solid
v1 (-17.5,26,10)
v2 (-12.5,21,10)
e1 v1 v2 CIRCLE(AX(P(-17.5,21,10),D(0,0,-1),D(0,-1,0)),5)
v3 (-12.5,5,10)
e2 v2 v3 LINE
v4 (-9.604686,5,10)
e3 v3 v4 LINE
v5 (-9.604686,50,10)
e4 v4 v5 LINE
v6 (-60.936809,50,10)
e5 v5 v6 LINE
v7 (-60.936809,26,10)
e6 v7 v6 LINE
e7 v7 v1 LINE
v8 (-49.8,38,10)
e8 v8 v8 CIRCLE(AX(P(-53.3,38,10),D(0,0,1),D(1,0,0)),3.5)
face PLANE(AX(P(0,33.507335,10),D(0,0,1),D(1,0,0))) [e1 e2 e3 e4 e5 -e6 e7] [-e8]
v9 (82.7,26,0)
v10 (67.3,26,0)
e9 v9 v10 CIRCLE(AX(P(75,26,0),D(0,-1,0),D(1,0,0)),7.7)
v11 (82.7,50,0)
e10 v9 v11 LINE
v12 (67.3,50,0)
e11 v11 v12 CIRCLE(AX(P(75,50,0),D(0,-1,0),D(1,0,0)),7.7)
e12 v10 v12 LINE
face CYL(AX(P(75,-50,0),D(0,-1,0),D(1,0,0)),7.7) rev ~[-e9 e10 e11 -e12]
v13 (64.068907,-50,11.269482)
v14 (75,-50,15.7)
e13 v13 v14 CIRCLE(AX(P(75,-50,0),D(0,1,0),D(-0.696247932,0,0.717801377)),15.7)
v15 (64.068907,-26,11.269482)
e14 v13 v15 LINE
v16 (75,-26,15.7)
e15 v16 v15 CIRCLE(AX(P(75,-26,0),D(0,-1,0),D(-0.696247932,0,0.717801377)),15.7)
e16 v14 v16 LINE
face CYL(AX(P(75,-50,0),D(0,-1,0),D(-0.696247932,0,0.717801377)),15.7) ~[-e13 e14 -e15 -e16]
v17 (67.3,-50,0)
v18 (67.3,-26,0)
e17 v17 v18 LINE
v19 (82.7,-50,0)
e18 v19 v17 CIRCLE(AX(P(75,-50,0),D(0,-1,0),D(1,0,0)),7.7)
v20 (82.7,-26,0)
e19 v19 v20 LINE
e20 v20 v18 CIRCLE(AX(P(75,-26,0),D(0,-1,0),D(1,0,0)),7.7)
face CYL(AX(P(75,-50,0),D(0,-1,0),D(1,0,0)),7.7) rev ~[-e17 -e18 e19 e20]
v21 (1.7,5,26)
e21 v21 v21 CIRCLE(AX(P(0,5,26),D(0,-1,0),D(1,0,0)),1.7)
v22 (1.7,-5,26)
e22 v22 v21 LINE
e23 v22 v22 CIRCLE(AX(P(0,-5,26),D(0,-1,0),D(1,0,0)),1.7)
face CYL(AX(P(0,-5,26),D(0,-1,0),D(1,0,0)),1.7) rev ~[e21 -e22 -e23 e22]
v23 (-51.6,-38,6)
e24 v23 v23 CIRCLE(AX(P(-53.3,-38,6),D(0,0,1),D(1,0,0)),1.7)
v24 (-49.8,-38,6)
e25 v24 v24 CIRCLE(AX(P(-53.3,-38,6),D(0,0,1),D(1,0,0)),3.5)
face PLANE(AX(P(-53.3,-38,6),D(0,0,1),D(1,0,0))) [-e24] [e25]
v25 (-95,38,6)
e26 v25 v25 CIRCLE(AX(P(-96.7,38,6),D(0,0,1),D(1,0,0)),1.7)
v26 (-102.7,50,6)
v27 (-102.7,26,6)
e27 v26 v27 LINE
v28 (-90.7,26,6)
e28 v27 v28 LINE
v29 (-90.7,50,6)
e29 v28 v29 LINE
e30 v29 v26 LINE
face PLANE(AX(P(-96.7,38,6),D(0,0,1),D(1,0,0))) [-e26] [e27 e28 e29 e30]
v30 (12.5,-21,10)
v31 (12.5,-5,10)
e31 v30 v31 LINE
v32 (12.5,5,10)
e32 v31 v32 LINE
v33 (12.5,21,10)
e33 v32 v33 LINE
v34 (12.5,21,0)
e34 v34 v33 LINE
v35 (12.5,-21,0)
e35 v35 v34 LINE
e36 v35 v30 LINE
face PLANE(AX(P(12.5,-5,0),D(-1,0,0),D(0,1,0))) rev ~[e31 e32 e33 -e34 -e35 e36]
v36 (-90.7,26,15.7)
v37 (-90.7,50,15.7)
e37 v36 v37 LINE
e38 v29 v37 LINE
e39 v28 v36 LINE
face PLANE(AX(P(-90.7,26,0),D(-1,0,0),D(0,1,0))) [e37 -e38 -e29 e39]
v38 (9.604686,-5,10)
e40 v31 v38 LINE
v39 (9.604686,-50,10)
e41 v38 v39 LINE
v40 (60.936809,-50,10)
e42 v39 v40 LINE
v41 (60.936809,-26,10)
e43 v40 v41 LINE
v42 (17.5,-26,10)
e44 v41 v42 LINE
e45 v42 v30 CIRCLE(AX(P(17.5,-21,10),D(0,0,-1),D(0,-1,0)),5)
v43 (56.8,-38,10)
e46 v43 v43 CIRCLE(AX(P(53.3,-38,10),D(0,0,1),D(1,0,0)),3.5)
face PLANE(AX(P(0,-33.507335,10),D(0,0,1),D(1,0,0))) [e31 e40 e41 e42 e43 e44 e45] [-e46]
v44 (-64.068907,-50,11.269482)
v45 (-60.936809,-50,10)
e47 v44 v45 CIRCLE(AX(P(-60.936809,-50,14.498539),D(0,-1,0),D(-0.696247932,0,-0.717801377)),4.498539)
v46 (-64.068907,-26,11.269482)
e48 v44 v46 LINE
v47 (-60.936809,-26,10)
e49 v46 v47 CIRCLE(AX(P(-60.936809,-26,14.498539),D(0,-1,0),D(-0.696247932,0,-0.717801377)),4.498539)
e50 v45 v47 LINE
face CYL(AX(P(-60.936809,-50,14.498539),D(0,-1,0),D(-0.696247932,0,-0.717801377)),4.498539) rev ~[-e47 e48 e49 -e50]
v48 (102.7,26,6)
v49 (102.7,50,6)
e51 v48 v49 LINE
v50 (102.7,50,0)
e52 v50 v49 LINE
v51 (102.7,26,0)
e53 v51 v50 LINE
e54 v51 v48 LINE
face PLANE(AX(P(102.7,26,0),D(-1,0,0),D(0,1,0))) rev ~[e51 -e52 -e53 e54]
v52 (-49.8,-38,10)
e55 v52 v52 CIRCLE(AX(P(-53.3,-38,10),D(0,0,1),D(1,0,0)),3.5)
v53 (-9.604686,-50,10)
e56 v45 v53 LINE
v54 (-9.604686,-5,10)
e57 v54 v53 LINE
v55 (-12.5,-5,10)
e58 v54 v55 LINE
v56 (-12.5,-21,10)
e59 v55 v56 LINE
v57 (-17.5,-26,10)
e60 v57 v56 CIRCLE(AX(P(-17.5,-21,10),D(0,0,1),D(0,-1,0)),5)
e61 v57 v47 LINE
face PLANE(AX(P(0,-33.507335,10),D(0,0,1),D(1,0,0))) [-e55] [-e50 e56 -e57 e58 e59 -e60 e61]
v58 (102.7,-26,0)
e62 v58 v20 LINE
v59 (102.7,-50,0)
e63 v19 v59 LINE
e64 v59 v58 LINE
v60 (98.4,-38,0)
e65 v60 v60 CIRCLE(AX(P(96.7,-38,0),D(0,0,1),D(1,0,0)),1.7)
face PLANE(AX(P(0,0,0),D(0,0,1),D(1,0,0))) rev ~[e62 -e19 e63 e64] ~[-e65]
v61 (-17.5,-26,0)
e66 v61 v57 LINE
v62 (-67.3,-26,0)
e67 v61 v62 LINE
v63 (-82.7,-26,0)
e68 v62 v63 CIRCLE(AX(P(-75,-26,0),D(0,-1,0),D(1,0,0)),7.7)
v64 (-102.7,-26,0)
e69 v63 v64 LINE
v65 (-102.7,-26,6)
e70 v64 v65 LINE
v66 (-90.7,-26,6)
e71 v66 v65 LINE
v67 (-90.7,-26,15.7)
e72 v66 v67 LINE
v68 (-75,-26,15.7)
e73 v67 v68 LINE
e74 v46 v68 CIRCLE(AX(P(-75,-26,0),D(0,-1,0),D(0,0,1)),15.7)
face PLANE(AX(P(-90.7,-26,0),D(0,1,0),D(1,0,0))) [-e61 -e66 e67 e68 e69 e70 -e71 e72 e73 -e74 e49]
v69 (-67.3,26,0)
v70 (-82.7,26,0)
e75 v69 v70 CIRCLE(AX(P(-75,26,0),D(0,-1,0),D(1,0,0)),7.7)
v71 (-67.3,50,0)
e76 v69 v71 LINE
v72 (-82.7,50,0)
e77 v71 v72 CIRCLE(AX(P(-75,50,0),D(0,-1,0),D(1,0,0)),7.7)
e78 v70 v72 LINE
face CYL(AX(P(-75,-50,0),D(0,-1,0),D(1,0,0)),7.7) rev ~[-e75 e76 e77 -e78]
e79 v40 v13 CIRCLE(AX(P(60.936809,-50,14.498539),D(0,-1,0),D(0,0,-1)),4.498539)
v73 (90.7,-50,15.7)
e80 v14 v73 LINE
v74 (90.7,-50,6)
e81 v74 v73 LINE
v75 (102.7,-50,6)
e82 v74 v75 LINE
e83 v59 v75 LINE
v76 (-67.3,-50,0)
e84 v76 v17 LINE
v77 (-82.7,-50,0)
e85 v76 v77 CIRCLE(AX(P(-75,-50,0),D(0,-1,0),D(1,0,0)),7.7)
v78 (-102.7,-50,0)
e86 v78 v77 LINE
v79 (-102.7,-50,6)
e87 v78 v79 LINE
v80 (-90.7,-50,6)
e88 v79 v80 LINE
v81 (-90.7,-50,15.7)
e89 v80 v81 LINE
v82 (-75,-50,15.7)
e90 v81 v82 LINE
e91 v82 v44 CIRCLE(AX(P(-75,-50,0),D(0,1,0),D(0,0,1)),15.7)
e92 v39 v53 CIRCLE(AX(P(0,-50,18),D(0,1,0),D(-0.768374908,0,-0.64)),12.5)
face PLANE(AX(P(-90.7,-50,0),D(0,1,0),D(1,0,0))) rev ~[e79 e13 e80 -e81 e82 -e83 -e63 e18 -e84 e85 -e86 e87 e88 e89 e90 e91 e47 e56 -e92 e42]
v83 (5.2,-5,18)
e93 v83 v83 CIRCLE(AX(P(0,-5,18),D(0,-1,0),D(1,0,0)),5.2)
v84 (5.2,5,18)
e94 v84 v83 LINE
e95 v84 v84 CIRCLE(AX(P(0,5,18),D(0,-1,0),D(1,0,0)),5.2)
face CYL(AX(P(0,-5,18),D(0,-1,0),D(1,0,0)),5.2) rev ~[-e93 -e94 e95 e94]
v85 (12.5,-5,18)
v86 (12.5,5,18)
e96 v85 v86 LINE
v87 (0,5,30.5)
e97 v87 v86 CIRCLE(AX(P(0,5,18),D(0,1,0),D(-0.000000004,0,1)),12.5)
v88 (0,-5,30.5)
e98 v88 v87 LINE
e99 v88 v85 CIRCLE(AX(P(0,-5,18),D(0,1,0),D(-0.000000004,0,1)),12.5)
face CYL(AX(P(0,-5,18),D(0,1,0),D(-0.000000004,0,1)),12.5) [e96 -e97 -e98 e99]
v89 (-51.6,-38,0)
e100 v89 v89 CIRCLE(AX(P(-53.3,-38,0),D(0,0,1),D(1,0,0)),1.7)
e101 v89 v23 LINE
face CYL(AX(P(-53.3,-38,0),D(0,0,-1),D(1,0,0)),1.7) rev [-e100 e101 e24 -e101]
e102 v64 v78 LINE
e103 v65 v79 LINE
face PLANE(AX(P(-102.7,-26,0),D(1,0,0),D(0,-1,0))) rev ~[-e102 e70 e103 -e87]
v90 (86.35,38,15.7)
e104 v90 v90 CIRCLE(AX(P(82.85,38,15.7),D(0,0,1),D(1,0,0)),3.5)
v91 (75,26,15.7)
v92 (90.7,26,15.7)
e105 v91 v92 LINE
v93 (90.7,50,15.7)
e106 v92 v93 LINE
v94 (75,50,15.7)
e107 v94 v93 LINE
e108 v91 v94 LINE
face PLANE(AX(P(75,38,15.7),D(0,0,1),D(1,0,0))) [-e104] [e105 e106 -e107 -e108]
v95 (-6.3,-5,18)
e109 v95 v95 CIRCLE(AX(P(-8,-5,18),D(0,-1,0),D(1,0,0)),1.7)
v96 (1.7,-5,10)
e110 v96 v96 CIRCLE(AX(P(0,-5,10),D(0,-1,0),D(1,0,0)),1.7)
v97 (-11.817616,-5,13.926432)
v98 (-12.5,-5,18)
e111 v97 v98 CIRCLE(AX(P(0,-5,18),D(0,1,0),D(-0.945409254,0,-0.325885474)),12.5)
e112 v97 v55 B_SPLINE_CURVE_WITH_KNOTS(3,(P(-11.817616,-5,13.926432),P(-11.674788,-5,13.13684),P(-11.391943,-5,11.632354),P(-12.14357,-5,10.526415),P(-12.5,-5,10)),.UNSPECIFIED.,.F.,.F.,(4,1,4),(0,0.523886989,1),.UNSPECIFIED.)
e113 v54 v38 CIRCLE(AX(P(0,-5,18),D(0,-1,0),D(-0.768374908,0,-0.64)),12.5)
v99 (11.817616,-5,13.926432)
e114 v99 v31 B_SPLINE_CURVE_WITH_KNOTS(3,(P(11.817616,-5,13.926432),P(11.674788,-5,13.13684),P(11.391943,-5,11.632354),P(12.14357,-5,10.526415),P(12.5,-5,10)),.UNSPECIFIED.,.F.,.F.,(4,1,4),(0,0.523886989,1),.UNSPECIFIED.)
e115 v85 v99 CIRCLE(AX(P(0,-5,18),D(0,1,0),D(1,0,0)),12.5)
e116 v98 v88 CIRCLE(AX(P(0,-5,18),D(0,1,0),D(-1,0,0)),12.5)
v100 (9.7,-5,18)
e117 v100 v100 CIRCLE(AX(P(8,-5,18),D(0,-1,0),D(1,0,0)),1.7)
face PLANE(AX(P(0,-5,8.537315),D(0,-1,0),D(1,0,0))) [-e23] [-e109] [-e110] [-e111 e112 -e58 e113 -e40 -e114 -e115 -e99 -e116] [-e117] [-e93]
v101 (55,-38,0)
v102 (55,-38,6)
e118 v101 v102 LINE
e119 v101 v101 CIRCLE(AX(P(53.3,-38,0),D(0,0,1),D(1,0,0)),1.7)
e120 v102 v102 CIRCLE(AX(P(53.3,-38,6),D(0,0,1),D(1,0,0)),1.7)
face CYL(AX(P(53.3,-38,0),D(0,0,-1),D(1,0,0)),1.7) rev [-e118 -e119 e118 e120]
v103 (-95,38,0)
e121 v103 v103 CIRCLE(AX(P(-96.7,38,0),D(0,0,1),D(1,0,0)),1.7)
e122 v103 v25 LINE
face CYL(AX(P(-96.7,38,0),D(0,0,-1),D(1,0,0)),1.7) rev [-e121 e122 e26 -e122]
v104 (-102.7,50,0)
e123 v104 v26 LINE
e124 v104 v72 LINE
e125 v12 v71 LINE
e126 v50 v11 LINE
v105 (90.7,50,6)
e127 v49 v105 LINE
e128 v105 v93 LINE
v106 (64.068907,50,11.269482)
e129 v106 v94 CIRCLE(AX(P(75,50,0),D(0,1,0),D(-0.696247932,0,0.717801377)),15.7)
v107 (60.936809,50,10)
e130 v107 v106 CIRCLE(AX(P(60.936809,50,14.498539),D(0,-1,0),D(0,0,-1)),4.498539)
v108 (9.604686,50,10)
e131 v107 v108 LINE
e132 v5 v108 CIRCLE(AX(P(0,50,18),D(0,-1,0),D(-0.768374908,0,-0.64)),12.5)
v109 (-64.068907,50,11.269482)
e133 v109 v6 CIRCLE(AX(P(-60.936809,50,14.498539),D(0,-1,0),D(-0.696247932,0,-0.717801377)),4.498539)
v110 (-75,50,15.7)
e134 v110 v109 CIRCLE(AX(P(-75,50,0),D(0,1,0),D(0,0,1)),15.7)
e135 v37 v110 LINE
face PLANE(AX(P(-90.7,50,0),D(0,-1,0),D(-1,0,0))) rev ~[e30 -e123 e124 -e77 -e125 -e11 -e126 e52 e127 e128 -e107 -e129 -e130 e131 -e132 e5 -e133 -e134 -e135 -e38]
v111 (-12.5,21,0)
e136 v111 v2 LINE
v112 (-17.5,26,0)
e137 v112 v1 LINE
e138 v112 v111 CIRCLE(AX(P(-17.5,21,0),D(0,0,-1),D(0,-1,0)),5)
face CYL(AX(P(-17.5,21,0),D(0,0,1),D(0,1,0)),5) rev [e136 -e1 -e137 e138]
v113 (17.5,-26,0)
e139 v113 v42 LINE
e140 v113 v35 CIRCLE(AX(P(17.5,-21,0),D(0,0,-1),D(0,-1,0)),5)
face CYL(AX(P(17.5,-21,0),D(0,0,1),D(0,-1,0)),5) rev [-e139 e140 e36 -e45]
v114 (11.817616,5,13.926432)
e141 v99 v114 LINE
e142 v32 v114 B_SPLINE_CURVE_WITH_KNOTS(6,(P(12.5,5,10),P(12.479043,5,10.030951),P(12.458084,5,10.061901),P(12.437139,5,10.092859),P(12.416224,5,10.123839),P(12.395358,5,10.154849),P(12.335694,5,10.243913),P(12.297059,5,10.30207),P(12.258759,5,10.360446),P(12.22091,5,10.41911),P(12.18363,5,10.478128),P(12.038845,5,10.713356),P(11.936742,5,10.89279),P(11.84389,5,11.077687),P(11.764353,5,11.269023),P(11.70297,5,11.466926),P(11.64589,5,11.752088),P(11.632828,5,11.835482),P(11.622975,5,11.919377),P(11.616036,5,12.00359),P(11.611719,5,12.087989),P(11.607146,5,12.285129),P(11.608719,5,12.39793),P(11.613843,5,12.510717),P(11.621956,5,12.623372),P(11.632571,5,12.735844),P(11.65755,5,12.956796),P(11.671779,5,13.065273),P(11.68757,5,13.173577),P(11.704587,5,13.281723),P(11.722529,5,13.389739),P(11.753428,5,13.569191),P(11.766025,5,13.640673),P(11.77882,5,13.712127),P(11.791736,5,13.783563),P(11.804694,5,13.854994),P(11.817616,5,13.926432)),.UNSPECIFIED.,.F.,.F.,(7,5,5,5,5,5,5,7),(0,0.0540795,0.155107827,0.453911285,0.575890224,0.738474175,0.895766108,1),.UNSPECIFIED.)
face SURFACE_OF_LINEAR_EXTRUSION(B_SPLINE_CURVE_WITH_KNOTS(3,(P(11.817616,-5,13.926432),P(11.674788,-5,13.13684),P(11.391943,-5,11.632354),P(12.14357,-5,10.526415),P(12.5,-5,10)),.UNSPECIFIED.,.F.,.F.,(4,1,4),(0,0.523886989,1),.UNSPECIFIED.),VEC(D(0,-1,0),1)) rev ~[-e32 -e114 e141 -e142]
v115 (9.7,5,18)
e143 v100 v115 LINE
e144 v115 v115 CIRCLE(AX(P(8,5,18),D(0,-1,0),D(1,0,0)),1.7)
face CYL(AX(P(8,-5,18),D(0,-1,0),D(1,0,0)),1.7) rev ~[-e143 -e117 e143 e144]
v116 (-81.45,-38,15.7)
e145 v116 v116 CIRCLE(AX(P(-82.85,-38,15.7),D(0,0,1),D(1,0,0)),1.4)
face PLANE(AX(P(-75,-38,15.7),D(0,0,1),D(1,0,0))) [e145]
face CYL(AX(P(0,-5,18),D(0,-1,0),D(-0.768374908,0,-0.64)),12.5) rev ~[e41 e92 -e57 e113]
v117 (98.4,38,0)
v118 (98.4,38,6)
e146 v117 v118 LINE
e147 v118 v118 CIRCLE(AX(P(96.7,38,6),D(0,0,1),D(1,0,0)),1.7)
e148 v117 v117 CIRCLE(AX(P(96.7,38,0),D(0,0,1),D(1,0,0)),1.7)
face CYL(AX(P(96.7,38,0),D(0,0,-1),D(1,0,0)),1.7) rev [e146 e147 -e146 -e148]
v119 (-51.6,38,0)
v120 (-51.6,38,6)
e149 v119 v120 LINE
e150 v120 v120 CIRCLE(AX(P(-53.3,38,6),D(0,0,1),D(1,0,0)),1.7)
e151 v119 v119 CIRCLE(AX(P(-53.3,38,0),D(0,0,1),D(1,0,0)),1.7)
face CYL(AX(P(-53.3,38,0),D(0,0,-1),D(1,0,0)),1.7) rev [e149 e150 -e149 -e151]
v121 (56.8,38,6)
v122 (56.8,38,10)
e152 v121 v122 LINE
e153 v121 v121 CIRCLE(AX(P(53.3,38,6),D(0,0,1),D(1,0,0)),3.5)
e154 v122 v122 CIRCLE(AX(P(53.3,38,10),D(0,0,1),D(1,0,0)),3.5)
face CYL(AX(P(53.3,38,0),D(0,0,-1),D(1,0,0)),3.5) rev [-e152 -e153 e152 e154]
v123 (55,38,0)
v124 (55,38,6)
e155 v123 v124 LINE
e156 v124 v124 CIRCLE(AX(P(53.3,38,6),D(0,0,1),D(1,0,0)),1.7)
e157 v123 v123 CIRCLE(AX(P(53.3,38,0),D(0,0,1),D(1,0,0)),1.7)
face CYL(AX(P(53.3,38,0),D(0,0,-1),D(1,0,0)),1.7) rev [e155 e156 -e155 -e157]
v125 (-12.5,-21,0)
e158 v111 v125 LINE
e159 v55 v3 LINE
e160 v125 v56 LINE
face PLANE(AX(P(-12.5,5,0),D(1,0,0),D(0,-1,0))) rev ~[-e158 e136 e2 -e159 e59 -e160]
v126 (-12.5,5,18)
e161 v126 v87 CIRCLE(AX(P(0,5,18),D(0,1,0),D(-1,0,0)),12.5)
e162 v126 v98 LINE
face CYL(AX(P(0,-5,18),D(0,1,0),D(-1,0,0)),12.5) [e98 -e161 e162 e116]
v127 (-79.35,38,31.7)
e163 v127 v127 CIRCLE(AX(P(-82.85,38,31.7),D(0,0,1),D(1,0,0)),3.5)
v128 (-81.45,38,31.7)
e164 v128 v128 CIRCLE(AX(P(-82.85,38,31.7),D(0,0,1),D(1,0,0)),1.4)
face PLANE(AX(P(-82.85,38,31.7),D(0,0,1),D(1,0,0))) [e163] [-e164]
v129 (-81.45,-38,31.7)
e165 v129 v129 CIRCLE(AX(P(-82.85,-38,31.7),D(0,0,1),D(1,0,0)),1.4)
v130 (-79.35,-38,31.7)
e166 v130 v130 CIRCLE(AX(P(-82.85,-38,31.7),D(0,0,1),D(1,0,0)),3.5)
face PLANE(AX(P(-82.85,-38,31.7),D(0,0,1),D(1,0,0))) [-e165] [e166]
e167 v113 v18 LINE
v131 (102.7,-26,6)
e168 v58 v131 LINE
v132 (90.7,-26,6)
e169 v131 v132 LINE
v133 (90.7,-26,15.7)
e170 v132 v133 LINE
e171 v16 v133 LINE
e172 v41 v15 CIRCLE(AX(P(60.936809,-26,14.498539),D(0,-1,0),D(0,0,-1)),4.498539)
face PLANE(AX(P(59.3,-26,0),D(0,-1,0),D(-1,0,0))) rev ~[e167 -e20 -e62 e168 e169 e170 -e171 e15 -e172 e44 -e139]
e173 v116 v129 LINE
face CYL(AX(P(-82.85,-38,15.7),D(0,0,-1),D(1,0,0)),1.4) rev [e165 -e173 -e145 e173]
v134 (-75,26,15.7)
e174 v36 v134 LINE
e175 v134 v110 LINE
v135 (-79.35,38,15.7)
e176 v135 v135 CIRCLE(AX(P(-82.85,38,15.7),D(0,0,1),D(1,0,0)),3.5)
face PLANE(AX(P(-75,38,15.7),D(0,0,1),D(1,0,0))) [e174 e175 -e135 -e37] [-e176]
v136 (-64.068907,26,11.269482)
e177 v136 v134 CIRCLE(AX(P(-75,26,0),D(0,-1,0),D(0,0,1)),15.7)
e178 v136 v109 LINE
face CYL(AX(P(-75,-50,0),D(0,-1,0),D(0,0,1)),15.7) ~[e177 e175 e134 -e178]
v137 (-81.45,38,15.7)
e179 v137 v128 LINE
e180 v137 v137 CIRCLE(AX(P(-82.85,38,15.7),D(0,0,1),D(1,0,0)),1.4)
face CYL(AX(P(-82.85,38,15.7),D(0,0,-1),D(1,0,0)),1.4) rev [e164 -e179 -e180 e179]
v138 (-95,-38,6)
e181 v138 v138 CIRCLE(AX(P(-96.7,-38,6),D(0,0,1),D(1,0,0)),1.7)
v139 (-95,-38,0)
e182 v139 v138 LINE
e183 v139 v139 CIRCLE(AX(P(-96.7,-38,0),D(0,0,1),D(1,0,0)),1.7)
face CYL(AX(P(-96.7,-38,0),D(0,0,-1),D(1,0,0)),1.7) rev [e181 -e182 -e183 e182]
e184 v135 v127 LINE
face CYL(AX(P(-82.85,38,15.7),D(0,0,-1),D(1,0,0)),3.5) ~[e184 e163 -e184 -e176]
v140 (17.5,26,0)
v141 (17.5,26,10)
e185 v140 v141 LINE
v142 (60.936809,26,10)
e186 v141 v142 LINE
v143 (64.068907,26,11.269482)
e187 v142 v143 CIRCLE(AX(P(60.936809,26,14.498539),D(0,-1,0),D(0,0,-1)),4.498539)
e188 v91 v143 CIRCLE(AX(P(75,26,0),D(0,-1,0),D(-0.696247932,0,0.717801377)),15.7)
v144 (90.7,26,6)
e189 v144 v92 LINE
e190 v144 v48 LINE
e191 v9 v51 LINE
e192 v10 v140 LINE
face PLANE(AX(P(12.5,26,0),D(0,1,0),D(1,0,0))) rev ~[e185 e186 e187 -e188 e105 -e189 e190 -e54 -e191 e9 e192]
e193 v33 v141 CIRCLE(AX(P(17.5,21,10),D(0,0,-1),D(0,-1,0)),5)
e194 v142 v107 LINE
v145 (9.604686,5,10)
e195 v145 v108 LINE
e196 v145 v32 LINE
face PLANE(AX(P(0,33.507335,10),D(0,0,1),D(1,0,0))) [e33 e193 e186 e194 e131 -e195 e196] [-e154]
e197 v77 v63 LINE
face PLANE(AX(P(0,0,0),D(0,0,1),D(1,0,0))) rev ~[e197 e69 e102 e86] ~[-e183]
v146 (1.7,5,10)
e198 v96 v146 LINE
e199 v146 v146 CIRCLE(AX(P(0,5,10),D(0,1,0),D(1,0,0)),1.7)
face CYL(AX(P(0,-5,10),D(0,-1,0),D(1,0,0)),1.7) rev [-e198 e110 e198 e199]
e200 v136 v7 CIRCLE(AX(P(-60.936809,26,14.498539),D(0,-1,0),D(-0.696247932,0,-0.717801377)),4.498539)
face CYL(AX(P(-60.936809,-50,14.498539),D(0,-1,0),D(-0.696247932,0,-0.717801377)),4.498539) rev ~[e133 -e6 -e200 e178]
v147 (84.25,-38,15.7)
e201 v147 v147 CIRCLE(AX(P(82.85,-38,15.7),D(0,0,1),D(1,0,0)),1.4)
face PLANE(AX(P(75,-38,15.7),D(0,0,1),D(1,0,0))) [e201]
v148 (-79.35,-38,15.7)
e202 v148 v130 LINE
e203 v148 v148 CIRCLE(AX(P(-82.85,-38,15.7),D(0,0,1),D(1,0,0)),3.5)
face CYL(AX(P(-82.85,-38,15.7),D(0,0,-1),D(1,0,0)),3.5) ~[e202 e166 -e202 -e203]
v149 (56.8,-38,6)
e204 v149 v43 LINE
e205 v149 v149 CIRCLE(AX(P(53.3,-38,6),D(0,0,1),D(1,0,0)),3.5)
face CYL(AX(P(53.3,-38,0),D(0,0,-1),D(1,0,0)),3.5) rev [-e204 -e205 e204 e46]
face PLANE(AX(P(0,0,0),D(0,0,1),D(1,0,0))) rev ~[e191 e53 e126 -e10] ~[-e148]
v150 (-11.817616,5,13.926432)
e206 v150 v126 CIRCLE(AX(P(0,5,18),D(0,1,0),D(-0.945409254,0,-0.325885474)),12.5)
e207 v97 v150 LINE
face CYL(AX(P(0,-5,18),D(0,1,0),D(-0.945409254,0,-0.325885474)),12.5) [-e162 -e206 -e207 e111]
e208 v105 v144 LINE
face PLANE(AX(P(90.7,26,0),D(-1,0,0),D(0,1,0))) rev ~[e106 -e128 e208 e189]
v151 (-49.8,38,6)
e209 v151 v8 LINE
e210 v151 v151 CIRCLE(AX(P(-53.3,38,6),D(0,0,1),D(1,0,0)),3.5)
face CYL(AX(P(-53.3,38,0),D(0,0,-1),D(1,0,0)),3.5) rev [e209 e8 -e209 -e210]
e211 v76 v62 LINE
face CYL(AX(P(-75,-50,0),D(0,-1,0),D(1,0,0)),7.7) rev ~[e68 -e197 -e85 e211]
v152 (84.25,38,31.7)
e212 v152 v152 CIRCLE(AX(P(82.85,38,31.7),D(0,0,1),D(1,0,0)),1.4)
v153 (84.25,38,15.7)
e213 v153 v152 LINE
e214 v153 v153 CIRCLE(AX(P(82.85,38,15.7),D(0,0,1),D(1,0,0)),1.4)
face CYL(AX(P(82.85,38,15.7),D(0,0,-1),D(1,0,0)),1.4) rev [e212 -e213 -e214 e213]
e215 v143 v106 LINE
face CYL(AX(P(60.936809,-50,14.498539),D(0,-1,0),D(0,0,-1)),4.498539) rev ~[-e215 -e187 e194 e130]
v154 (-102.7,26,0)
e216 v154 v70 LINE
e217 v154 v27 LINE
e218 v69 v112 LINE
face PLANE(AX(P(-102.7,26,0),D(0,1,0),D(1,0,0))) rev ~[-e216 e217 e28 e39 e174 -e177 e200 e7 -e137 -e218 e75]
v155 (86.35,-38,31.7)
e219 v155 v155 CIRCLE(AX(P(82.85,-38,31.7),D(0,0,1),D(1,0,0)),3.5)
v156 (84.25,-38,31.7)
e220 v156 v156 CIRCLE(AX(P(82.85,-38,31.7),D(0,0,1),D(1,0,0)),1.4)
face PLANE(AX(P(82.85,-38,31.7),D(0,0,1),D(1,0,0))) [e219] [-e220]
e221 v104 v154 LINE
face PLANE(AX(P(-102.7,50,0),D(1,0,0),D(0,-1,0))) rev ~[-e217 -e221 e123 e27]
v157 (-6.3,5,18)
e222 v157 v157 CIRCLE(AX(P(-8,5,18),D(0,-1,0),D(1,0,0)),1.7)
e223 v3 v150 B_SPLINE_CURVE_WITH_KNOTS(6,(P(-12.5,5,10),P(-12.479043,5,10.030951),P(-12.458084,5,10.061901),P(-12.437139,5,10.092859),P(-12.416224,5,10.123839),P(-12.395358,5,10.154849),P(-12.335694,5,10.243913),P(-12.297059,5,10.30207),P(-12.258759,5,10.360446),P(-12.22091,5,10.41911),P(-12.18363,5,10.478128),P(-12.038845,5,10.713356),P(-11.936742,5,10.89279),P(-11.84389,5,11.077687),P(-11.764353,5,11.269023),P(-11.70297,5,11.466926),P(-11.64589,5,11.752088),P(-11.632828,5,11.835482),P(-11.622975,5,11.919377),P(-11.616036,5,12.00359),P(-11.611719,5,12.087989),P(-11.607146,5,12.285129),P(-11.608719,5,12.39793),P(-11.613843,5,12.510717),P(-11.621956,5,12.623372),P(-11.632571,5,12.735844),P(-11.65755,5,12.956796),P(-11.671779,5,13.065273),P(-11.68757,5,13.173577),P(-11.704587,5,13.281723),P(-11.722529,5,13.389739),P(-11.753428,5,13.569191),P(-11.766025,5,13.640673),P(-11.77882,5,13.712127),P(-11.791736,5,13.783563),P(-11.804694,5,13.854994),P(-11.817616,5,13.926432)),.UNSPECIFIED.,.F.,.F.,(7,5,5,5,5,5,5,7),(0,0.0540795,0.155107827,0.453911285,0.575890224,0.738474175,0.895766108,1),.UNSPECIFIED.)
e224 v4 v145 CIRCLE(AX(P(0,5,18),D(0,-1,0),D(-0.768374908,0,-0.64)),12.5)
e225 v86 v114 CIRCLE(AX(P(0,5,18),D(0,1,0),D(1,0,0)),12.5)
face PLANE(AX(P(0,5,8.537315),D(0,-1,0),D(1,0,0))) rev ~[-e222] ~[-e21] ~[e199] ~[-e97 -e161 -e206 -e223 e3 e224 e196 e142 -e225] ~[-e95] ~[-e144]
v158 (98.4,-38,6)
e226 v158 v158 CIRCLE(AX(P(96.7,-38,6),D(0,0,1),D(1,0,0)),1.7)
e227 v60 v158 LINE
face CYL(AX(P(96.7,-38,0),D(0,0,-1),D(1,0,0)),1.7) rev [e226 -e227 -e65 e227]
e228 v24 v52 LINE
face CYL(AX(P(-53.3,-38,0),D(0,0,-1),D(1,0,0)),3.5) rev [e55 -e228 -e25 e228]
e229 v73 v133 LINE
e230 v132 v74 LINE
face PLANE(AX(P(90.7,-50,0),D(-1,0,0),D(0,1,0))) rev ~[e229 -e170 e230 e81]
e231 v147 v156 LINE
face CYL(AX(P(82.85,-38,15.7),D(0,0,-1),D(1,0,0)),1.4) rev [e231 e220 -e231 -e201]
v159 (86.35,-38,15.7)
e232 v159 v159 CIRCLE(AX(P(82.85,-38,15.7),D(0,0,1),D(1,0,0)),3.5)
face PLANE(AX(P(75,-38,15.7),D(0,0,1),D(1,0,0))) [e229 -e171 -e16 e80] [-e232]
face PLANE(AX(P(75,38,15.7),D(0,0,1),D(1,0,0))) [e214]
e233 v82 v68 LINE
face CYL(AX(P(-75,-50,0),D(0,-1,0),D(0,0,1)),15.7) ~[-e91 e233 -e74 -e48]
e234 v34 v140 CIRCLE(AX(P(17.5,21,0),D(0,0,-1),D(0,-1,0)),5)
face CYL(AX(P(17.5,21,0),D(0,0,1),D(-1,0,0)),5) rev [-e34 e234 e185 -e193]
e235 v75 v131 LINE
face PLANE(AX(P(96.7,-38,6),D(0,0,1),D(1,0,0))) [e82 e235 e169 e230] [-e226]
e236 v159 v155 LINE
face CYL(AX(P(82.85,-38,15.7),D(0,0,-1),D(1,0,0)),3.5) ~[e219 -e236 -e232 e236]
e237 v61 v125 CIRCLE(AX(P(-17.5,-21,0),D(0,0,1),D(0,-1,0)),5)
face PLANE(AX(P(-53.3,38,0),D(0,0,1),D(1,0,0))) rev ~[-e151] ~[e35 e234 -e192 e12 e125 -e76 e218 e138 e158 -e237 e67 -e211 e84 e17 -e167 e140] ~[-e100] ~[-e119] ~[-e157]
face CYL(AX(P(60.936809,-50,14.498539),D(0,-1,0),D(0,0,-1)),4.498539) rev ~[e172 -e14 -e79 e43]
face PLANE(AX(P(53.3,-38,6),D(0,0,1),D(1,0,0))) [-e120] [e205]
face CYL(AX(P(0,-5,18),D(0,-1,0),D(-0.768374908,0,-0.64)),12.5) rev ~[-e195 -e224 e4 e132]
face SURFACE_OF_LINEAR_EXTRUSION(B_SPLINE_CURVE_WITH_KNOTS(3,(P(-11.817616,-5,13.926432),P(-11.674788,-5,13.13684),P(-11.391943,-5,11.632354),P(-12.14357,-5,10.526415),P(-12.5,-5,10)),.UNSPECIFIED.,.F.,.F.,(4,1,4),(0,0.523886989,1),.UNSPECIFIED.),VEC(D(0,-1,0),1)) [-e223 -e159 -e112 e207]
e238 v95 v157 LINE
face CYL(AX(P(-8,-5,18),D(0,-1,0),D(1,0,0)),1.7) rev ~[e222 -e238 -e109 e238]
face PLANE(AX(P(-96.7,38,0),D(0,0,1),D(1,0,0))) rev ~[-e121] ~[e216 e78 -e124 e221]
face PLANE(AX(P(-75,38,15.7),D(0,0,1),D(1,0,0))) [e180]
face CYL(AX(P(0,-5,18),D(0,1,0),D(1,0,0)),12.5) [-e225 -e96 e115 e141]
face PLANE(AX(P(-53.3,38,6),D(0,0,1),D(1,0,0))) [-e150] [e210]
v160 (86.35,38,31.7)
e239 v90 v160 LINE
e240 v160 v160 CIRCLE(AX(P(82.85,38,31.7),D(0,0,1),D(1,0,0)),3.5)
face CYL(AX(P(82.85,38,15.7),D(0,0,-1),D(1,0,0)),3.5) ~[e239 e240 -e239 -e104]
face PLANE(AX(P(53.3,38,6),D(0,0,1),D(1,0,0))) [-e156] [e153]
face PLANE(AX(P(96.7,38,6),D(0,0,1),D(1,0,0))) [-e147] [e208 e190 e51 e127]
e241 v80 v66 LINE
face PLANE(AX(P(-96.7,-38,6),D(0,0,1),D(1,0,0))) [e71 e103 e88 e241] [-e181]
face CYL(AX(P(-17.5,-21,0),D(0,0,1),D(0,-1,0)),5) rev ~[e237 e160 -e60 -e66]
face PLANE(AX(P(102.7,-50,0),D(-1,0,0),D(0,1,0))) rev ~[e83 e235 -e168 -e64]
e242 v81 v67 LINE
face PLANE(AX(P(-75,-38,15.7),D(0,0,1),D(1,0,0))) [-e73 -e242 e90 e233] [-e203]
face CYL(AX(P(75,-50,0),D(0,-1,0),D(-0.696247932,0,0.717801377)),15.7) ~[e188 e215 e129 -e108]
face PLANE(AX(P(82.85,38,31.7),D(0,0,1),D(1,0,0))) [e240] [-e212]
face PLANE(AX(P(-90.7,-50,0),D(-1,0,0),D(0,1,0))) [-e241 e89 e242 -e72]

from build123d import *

# Parameters (mm, degrees)
F0_R      = 3.5
F1_DEPTH  = 10
F0_W      = 31.4
F0_H      = 24
F2_DEPTH  = 15.7
F3_DEPTH  = 30.5
F6_DEPTH  = 100
F7_R      = 1.7
F7_R_2    = 5.2
F8_DEPTH  = 60
F9_DEPTH  = 100
F10_DEPTH = 100
F11_DEPTH = 10
F12_R     = 5
F0_R_2    = 1.7
F13_DEPTH = 6
F14_DEPTH = 6
F15_R     = 3.5
F15_R_2   = 1.4
F16_DEPTH = 16


# Not quite as in the source:
# - a feature names something its author has since deleted; it is built from what else it names


with BuildPart() as f1:
    # F0 (on Top) → F1 (new body)
    with BuildSketch(Plane.XY):
        Polygon((59.3, 50), (0, 50), (-59.3, 50), (-59.3, 26), (-12.5, 26), (-12.5, 5), (12.5, 5), (12.5, 26), (59.3, 26), align=None)
        with Locations((-53.3, 38)):
            Circle(F0_R, mode=Mode.SUBTRACT)
        with Locations((53.3, 38)):
            Circle(F0_R, mode=Mode.SUBTRACT)
    extrude(amount=F1_DEPTH)

    # F0 (on Top) → F2 (join)
    with BuildSketch(Plane.XY):
        with Locations((-75, 38)):
            Rectangle(F0_W, F0_H)
        with Locations((75, 38)):
            Rectangle(F0_W, F0_H)
    extrude(amount=F2_DEPTH)



with BuildPart() as f1b:
    # F0 (on Top) → F1, piece 2 (new body)
    with BuildSketch(Plane.XY):
        Polygon((12.5, -5), (-12.5, -5), (-12.5, -26), (-59.3, -26), (-59.3, -50), (0, -50), (59.3, -50), (59.3, -26), (12.5, -26), align=None)
        with Locations((-53.3, -38)):
            Circle(F0_R, mode=Mode.SUBTRACT)
        with Locations((53.3, -38)):
            Circle(F0_R, mode=Mode.SUBTRACT)
    extrude(amount=F1_DEPTH)

    # F0 (on Top) → F2, piece 2 (join)
    with BuildSketch(Plane.XY):
        with Locations((-75, -38)):
            Rectangle(F0_W, F0_H)
        with Locations((75, -38)):
            Rectangle(F0_W, F0_H)
    extrude(amount=F2_DEPTH)


with BuildPart() as f1_1:
    add(f1.part)

    add(f1b.part)  # F3 merges F1b
    # F0 (on Top) → F3 (join)
    with BuildSketch(Plane.XY):
        Polygon((12.5, 5), (-12.5, 5), (-12.5, 0), (-12.5, -5), (12.5, -5), (12.5, 0), align=None)
    extrude(amount=F3_DEPTH)

    # F4: union 

    # F5 (on face) → F6 (cut)
    with BuildSketch(Plane.XZ.offset(50)):
        with BuildLine():
            Line((59.3, 15.7), (59.3, 10))
            Line((59.3, 10), (60.936808709, 10))
            ThreePointArc((60.936808709, 10), (62.6266035374, 10.3294327596), (64.0689074703, 11.2694816254))
            ThreePointArc((64.0689074703, 11.2694816254), (69.1025794418, 14.5502725321), (75, 15.7))
            Line((75, 15.7), (59.3, 15.7))
        make_face()
        with BuildLine():
            ThreePointArc((82.7, 0), (75, 7.7), (67.3, 0))
            Line((67.3, 0), (82.7, 0))
        make_face()
        with BuildLine():
            ThreePointArc((-75, 15.7), (-69.1025794418, 14.5502725321), (-64.0689074703, 11.2694816254))
            ThreePointArc((-64.0689074703, 11.2694816254), (-62.6266035374, 10.3294327596), (-60.936808709, 10))
            Line((-60.936808709, 10), (-59.3, 10))
            Line((-59.3, 10), (-59.3, 15.7))
            Line((-59.3, 15.7), (-75, 15.7))
        make_face()
        with BuildLine():
            ThreePointArc((-67.3, 0), (-75, 7.7), (-82.7, 0))
            Line((-82.7, 0), (-67.3, 0))
        make_face()
    extrude(amount=-F6_DEPTH, mode=Mode.SUBTRACT)

    # F7 (on face) → F8 (cut, symmetric)
    with BuildSketch(Plane.XZ.offset(5)):
        with BuildLine():
            Line((-12.5, 30.5), (-12.5, 18))
            ThreePointArc((-12.5, 18), (-8.8388347819, 26.8388347478), (-4.83e-08, 30.5))
            Line((-4.83e-08, 30.5), (-12.5, 30.5))
        make_face()
        with BuildLine():
            Line((12.5, 30.5), (-4.83e-08, 30.5))
            ThreePointArc((-4.83e-08, 30.5), (8.8388347478, 26.8388347819), (12.5, 18))
            Line((12.5, 18), (12.5, 30.5))
        make_face()
        with BuildLine():
            add(Edge.make_bspline(
                [(-11.8176156762, 13.9264315731), (-11.6747882381, 13.1368398711), (-11.3919431578, 11.6323543495), (-12.1435697242, 10.5264146596), (-12.5, 10)],
                knots=[0, 0, 0, 0, 0.5238869887, 1, 1, 1, 1], degree=3))
            ThreePointArc((-11.8176156762, 13.9264315731), (-12.3282236343, 15.9348360783), (-12.5, 18))
            Line((-12.5, 18), (-12.5, 10))
        make_face()
        with BuildLine():
            Line((12.5, 10), (12.5, 18))
            ThreePointArc((12.5, 18), (12.3282236343, 15.9348360783), (11.8176156762, 13.9264315731))
            add(Edge.make_bspline(
                [(11.8176156762, 13.9264315731), (11.6747882381, 13.1368398711), (11.3919431578, 11.6323543495), (12.1435697242, 10.5264146596), (12.5, 10)],
                knots=[0, 0, 0, 0, 0.5238869887, 1, 1, 1, 1], degree=3))
        make_face()
        with Locations((-8, 18)):
            Circle(F7_R)
        with Locations((0, 26)):
            Circle(F7_R)
        with Locations((8, 18)):
            Circle(F7_R)
        with BuildLine():
            ThreePointArc((1.7, 10), (0, 11.7), (-1.7, 10))
            Line((-1.7, 10), (1.7, 10))
        make_face()
        with BuildLine():
            Line((1.7, 10), (-1.7, 10))
            ThreePointArc((-1.7, 10), (0, 8.3), (1.7, 10))
        make_face()
        with Locations((0, 18)):
            Circle(F7_R_2)
    extrude(amount=F8_DEPTH, both=True, mode=Mode.SUBTRACT)

    # F7 (on face) → F9 (cut)
    with BuildSketch(Plane.XZ.offset(5)):
        with BuildLine():
            Line((-1.7, 10), (-9.6046863561, 10))
            ThreePointArc((-9.6046863561, 10), (0, 5.5), (9.6046863561, 10))
            Line((9.6046863561, 10), (1.7, 10))
            ThreePointArc((1.7, 10), (0, 8.3), (-1.7, 10))
        make_face()
    extrude(amount=F9_DEPTH, mode=Mode.SUBTRACT)

    # F7 (on face) → F10 (cut)
    with BuildSketch(Plane.XZ.offset(5)):
        with BuildLine():
            Line((-1.7, 10), (-9.6046863561, 10))
            ThreePointArc((-9.6046863561, 10), (0, 5.5), (9.6046863561, 10))
            Line((9.6046863561, 10), (1.7, 10))
            ThreePointArc((1.7, 10), (0, 8.3), (-1.7, 10))
        make_face()
    extrude(amount=-F10_DEPTH, mode=Mode.SUBTRACT)

    # F7 (on face) → F11 (join)
    with BuildSketch(Plane.XZ.offset(5)):
        with BuildLine():
            Line((-1.7, 10), (-9.6046863561, 10))
            ThreePointArc((-9.6046863561, 10), (0, 5.5), (9.6046863561, 10))
            Line((9.6046863561, 10), (1.7, 10))
            ThreePointArc((1.7, 10), (0, 8.3), (-1.7, 10))
        make_face()
    extrude(amount=-F11_DEPTH)

    # F12
    f12_edges = [f1_1.edges().sort_by_distance(p)[0] for p in [
        (-12.5, 26, 5),
        (12.5, 26, 5),
        (-12.5, -26, 5),
        (12.5, -26, 5),
    ]]
    fillet(f12_edges, radius=F12_R)

    # F0 (on Top) → F13 (join)
    with BuildSketch(Plane.XY):
        Polygon((-90.7, 26), (-90.7, 50), (-99.7, 50), (-102.7, 50), (-102.7, 26), (-99.7, 26), align=None)
        with Locations((-96.7, 38)):
            Circle(F0_R_2, mode=Mode.SUBTRACT)
        Polygon((-90.7, -50), (-90.7, -26), (-99.7, -26), (-102.7, -26), (-102.7, -50), (-99.7, -50), align=None)
        with Locations((-96.7, -38)):
            Circle(F0_R_2, mode=Mode.SUBTRACT)
        Polygon((99.7, -26), (90.7, -26), (90.7, -50), (99.7, -50), (102.7, -50), (102.7, -26), align=None)
        with Locations((96.7, -38)):
            Circle(F0_R_2, mode=Mode.SUBTRACT)
        Polygon((99.7, 50), (90.7, 50), (90.7, 26), (99.7, 26), (102.7, 26), (102.7, 50), align=None)
        with Locations((96.7, 38)):
            Circle(F0_R_2, mode=Mode.SUBTRACT)
    extrude(amount=F13_DEPTH)

    # F0 (on Top) → F14 (join)
    with BuildSketch(Plane.XY):
        with Locations((-53.3, 38)):
            Circle(F0_R)
        with Locations((-53.3, 38)):
            Circle(F0_R_2, mode=Mode.SUBTRACT)
        with Locations((53.3, 38)):
            Circle(F0_R)
        with Locations((53.3, 38)):
            Circle(F0_R_2, mode=Mode.SUBTRACT)
        with Locations((-53.3, -38)):
            Circle(F0_R)
        with Locations((-53.3, -38)):
            Circle(F0_R_2, mode=Mode.SUBTRACT)
        with Locations((53.3, -38)):
            Circle(F0_R)
        with Locations((53.3, -38)):
            Circle(F0_R_2, mode=Mode.SUBTRACT)
    extrude(amount=F14_DEPTH)

    # F15 (on face) → F16 (join)
    with BuildSketch(Plane.XY.offset(15.7)):
        with Locations((-82.85, 38)):
            Circle(F15_R)
        with Locations((-82.85, 38)):
            Circle(F15_R_2, mode=Mode.SUBTRACT)
        with Locations((82.85, 38)):
            Circle(F15_R)
        with Locations((82.85, 38)):
            Circle(F15_R_2, mode=Mode.SUBTRACT)
        with Locations((82.85, -38)):
            Circle(F15_R)
        with Locations((82.85, -38)):
            Circle(F15_R_2, mode=Mode.SUBTRACT)
        with Locations((-82.85, -38)):
            Circle(F15_R)
        with Locations((-82.85, -38)):
            Circle(F15_R_2, mode=Mode.SUBTRACT)
    extrude(amount=F16_DEPTH)


solid = f1_1.part
